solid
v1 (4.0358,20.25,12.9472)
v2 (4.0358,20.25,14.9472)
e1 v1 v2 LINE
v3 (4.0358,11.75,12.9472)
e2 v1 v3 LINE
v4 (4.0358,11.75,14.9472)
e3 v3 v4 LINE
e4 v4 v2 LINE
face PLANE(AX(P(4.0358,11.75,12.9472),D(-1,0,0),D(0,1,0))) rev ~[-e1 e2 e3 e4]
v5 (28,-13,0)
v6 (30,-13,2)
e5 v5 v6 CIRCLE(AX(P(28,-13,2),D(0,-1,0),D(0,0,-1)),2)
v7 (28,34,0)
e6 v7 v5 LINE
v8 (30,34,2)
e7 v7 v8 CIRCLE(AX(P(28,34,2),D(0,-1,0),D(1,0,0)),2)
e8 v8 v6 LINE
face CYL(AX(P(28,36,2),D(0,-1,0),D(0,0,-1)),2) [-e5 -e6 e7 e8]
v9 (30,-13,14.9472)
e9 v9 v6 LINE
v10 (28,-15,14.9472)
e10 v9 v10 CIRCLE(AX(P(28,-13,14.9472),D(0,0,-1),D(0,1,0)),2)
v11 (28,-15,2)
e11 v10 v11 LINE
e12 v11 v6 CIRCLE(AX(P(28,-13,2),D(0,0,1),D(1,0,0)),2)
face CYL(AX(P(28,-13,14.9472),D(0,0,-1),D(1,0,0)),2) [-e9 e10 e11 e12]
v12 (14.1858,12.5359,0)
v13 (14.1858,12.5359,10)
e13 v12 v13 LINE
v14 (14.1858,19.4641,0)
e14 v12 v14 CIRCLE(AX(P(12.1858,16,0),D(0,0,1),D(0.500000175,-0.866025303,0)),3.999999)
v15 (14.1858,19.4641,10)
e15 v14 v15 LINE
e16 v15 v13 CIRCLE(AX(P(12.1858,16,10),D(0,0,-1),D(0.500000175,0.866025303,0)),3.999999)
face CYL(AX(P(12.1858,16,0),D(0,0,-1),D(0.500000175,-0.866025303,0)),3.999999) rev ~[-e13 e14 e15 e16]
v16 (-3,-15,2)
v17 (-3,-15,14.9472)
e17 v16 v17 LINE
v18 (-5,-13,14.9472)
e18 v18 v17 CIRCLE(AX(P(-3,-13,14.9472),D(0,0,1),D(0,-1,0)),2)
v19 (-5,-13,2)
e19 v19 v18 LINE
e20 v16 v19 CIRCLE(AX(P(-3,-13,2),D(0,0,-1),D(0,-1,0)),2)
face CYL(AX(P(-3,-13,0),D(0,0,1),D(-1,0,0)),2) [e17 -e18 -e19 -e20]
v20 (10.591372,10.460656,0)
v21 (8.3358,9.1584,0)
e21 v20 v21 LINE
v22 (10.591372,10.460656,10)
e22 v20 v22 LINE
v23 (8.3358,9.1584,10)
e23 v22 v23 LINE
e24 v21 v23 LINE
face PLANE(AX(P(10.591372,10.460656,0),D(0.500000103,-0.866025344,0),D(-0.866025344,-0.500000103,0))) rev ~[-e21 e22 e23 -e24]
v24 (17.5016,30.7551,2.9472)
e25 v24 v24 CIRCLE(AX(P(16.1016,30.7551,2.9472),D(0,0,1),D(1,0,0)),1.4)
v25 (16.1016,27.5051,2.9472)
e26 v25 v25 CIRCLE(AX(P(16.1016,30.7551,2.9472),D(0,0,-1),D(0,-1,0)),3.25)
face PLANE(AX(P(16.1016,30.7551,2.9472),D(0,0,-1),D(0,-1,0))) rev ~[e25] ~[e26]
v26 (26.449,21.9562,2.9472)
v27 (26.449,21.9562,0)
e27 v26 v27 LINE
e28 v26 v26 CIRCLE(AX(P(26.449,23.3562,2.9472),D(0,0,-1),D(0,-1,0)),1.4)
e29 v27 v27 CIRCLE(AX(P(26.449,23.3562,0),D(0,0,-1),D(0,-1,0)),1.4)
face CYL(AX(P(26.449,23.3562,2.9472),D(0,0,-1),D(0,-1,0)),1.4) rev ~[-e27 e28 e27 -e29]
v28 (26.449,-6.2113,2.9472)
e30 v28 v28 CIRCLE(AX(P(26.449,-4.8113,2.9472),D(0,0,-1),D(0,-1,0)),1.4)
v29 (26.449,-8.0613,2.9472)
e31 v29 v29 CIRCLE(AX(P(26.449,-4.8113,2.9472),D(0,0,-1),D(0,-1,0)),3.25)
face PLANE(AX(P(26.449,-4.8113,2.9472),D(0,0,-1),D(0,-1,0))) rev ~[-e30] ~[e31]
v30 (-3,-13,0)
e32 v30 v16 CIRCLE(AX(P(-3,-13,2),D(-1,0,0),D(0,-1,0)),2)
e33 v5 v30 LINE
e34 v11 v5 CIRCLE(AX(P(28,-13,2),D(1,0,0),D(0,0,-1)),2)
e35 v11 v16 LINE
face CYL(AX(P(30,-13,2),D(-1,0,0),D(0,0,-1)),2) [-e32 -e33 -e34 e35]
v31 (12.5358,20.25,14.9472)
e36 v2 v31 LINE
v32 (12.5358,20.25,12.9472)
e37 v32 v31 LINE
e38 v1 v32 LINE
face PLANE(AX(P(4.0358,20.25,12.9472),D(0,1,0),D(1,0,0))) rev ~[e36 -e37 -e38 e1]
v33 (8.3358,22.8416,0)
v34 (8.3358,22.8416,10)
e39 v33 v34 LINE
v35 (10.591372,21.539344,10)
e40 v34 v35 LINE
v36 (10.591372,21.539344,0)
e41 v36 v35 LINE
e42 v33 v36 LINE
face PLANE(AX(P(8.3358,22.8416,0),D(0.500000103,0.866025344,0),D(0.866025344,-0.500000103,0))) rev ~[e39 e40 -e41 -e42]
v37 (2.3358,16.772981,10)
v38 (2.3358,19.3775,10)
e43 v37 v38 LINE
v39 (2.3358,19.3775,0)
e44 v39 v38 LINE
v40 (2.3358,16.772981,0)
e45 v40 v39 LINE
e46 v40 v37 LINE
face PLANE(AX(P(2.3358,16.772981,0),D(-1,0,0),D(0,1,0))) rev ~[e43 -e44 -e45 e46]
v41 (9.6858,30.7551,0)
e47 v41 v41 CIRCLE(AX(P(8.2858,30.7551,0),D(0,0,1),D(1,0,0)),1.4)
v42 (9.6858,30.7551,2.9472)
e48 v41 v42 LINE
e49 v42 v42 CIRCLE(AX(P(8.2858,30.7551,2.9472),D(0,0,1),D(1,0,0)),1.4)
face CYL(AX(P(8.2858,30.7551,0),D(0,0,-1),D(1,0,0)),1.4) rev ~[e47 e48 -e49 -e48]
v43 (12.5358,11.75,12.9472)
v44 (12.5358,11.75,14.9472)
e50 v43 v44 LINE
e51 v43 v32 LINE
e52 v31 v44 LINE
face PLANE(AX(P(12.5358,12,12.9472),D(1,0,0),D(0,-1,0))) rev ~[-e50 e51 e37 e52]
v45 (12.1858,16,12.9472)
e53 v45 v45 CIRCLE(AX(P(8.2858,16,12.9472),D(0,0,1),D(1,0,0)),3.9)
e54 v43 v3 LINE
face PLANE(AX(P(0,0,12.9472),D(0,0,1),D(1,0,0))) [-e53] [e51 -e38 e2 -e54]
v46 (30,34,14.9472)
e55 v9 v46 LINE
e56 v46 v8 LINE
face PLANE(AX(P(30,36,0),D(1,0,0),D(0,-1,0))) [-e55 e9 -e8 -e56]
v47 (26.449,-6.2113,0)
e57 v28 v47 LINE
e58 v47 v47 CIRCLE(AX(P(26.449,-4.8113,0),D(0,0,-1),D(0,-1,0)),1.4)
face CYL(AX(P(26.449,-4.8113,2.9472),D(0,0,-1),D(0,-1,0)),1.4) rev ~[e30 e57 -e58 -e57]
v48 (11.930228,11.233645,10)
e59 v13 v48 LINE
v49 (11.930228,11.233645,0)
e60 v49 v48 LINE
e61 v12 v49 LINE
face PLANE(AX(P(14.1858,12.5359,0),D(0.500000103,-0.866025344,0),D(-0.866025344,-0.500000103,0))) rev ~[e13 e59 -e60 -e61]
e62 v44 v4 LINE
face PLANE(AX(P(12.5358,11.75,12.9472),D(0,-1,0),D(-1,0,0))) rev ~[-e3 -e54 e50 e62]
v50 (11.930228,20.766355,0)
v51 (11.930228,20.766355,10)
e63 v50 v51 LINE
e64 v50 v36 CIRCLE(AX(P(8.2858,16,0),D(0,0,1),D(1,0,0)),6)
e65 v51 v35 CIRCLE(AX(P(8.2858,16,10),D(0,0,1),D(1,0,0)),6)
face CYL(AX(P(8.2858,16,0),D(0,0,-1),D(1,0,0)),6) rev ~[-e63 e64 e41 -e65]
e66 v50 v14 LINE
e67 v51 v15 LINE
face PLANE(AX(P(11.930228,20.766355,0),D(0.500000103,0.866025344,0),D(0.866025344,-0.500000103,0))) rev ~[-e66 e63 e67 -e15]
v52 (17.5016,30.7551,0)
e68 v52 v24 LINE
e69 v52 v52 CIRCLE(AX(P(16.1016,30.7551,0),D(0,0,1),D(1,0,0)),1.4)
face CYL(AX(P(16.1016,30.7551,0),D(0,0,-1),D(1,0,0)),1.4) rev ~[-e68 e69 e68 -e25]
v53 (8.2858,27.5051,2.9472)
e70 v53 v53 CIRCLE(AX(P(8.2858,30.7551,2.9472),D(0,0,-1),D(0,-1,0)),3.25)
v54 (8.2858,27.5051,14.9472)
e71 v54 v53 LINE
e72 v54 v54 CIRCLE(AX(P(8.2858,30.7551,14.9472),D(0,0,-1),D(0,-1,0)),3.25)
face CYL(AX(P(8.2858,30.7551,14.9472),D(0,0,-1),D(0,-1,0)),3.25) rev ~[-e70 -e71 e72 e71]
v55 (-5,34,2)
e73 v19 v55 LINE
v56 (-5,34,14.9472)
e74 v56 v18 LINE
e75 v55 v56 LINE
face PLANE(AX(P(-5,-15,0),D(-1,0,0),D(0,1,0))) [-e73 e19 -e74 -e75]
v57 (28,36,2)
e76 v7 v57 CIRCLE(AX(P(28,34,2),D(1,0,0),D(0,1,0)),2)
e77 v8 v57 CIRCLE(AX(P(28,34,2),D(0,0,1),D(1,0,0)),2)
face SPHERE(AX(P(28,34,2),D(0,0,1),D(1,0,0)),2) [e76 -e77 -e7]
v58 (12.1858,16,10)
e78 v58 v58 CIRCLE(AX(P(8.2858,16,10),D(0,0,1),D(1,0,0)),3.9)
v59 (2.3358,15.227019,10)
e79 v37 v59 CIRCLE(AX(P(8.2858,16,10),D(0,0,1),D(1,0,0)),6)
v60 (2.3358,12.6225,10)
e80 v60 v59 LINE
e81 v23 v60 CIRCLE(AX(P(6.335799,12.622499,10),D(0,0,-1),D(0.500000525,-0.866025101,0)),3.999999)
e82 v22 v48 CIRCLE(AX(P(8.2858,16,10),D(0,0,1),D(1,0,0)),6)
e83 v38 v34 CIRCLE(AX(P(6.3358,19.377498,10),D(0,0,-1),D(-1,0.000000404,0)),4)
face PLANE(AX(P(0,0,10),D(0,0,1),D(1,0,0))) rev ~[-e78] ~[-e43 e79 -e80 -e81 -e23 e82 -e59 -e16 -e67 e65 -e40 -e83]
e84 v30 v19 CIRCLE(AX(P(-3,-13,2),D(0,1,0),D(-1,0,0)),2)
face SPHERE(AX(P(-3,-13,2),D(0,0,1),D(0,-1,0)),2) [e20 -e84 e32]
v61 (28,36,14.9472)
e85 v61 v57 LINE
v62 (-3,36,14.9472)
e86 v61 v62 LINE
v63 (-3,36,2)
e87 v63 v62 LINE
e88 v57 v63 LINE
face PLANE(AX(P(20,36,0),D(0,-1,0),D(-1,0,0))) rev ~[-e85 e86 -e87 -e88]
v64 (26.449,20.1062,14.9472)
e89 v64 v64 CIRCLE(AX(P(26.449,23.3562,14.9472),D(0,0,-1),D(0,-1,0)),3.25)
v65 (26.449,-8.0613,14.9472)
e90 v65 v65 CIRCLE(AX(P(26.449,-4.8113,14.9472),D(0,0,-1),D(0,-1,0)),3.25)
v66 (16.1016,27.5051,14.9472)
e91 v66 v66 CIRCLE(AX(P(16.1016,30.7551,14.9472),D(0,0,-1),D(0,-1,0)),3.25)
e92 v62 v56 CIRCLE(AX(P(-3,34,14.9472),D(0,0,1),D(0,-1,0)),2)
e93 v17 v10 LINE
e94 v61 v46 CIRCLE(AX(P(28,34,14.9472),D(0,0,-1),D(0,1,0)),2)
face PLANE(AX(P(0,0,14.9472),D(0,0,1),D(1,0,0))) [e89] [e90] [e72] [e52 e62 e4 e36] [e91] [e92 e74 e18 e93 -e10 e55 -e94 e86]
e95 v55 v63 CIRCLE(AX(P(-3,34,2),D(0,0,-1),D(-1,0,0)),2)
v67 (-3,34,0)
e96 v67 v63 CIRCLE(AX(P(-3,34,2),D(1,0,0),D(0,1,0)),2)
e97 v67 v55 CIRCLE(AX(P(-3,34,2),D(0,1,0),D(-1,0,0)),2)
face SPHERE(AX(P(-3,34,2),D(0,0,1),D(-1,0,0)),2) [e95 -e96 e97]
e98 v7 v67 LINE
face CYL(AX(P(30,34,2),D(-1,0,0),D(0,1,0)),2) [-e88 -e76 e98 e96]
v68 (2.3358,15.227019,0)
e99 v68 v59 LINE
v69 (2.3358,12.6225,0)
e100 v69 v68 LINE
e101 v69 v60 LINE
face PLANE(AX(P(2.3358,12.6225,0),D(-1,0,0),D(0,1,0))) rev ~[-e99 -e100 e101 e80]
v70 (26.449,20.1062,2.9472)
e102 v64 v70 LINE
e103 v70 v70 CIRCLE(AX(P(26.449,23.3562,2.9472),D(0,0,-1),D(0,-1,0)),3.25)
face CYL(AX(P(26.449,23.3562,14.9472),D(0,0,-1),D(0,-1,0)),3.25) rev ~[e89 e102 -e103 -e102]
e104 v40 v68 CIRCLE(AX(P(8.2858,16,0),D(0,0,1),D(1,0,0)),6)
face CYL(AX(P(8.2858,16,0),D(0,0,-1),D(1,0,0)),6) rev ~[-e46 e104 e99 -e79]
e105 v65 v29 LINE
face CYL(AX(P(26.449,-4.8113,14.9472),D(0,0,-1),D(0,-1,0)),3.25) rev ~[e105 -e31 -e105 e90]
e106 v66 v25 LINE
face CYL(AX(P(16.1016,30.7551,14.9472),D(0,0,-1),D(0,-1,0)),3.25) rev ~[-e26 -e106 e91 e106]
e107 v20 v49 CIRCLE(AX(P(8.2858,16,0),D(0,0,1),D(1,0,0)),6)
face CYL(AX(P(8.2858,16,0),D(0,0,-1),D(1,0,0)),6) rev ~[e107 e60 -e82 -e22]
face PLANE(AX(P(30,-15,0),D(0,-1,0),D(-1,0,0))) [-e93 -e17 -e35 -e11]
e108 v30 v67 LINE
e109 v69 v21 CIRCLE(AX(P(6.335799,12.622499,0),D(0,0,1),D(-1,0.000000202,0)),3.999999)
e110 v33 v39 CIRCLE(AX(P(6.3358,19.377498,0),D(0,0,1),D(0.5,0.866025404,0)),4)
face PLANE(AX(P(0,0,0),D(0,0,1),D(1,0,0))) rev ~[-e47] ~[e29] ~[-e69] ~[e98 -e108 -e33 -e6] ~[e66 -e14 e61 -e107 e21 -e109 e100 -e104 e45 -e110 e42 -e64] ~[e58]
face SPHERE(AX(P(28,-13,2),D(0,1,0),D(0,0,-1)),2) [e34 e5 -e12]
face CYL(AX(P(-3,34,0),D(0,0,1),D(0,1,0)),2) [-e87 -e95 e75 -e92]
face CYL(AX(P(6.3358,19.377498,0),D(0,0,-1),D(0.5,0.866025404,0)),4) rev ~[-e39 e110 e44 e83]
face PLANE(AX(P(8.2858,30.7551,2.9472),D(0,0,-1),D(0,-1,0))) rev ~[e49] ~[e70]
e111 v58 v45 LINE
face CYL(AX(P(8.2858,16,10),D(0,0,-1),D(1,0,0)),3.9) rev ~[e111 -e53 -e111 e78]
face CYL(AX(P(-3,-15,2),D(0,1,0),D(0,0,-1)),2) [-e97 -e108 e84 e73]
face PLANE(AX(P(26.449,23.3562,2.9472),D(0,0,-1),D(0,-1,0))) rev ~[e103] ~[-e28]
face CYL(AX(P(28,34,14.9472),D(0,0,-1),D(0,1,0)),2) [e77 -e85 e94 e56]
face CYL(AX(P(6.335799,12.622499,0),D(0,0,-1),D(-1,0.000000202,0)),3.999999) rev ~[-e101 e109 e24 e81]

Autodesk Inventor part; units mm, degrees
ref_plane "YZ Plane" through (0, 0, 0) normal (1, 0, 0) x (0, 1, 0)
ref_plane "XZ Plane" through (0, 0, 0) normal (0, 1, 0) x (-1, 0, 0)
ref_plane "XY Plane" through (0, 0, 0) normal (0, 0, 1) x (1, 0, 0)
ref_plane "Arbeitsebene1" through (0, 0, 0) normal (0, 0, 1) x (1, 0, 0)
sketch "Skizze1" plane through (0, 0, 0) normal (0, 0, 1) x (1, 0, 0)
  line L0 (20, 36) -> (0, 36) projected
  line L1 (0, 0) -> (0, 36) projected
  line L2 (20, 0) -> (0, 0) projected
  line L3 (20, 0) -> (20, 36) projected
  arc A0 (15.4309, 14.7711) -> (15.4309, 17.2289) centre (16.1016, 16) ccw projected
  arc A1 (15.4309, 17.2289) -> (15.4309, 14.7711) centre (8.2858, 16) ccw projected
  circle A2 centre (8.2858, 30.7551) radius 1.4 projected
  circle A3 centre (16.1016, 30.7551) radius 1.4 projected
  circle A4 centre (8.2858, 16) radius 6 projected
  line L4 (14.1858, 12.5359) -> (8.3358, 9.1584)
  line L5 (2.3358, 12.6225) -> (2.3358, 19.3775)
  line L6 (8.3358, 22.8416) -> (14.1858, 19.4641)
  circle A5 centre (8.2858, 16) radius 5.95
  arc A6 (14.1858, 12.5359) -> (14.1858, 19.4641) centre (12.1858, 16) ccw
  arc A7 (2.3358, 12.6225) -> (8.3358, 9.1584) centre (6.3358, 12.6225) ccw
  arc A8 (8.3358, 22.8416) -> (2.3358, 19.3775) centre (6.3358, 19.3775) ccw
  line L7 (-5, 36) -> (30, 36)
  line L8 (30, 36) -> (30, -15)
  line L9 (30, -15) -> (-5, -15)
  line L10 (-5, -15) -> (-5, 36)
  point P0 (20.1858, 16)
  point P1 (2.3358, 5.6943)
  point P2 (2.3358, 26.3057)
  point P3 (10.5914, 21.5393)
  point P4 (11.9302, 20.7664)
  point P5 (11.9302, 11.2336)
  point P6 (10.5914, 10.4607)
  point P7 (2.3358, 15.227)
  point P8 (2.3358, 16.773)
  dimension "d0" = 11.9
  dimension "d1" = 4
  dimension "d2" = 10
  dimension "d3" = 0
  dimension "d4" = 5
  dimension "d5" = 15
extrude "Extrusion1" add sketch "Skizze1" along normal blind 10 contours L3 L2 L1 L0 | L7 L8 L9 L10 L1 L2 L3 | A6 A0 | A1 A7 L4 A4 A6 | A6 L6 A4 A8 A1 | A1 A8 L5 A4 A7
sketch "Skizze2" plane through (0, 0, 10) normal (0, 0, 1) x (1, 0, 0)
  line L0 (-5, -15) -> (30, -15) projected
  line L1 (30, -15) -> (30, 36) projected
  line L2 (30, 36) -> (-5, 36) projected
  line L3 (-5, 36) -> (-5, -15) projected
  circle A0 centre (16.1016, 30.7551) radius 1.4 projected
  circle A1 centre (8.2858, 30.7551) radius 1.4 projected
  arc A2 (8.3358, 22.8416) -> (2.3358, 19.3775) centre (6.3358, 19.3775) ccw projected
  line L4 (8.3358, 22.8416) -> (10.5914, 21.5393) projected
  arc A3 (11.9302, 20.7664) -> (10.5914, 21.5393) centre (8.2858, 16) ccw projected
  line L5 (11.9302, 20.7664) -> (14.1858, 19.4641) projected
  arc A4 (14.1858, 12.5359) -> (14.1858, 19.4641) centre (12.1858, 16) ccw projected
  line L6 (14.1858, 12.5359) -> (11.9302, 11.2336) projected
  arc A5 (10.5914, 10.4607) -> (11.9302, 11.2336) centre (8.2858, 16) ccw projected
  line L7 (10.5914, 10.4607) -> (8.3358, 9.1584) projected
  arc A6 (2.3358, 12.6225) -> (8.3358, 9.1584) centre (6.3358, 12.6225) ccw projected
  line L8 (2.3358, 12.6225) -> (2.3358, 15.227) projected
  arc A7 (2.3358, 16.773) -> (2.3358, 15.227) centre (8.2858, 16) ccw projected
  line L9 (2.3358, 16.773) -> (2.3358, 19.3775) projected
  circle A8 centre (8.2858, 16) radius 3.9
  point P0 (0, 0)
  dimension "d8" = 7.8
extrude "Extrusion2" add sketch "Skizze2" along normal up to surface (2.9472 mm away) contours L3 L2 L1 L0 | L4 A3 L5 A4 L6 A5 L7 A6 L8 A7 L9 A2
sketch "Skizze3" plane through (0, 0, 12.9472) normal (0, 0, 1) x (1, 0, 0)
  circle A0 centre (8.2858, 16) radius 3.6158 projected
  line L0 (4.0358, 12) -> (4.0358, 20) projected
  line L1 (12.5358, 20) -> (12.5358, 12) projected
  line L2 (4.0358, 20.25) -> (12.5358, 20.25)
  line L3 (12.5358, 20.25) -> (12.5358, 11.75)
  line L4 (12.5358, 11.75) -> (4.0358, 11.75)
  line L5 (4.0358, 11.75) -> (4.0358, 20.25)
  line L6 (4.0358, 20.25) -> (12.5358, 11.75) construction
  line L7 (12.5358, 20.25) -> (4.0358, 11.75) construction
  line L8 (30, -15) -> (30, 36) projected
  line L9 (30, 36) -> (-5, 36) projected
  line L10 (-5, 36) -> (-5, -15) projected
  line L11 (-5, -15) -> (30, -15) projected
  circle A1 centre (8.2858, 16) radius 3.9 projected
  circle A2 centre (8.2858, 30.7551) radius 1.4 projected
  circle A3 centre (16.1016, 30.7551) radius 1.4 projected
  point P0 (0, 0)
  point P1 (11.389, 20.2649)
  dimension "d11" = 8.5
  dimension "d12" = 8.5
extrude "Extrusion3" add sketch "Skizze3" along normal blind 2 contours L11 L10 L9 L8 | A3
sketch "Skizze4" plane through (0, 0, 14.9472) normal (0, 0, 1) x (1, 0, 0)
  circle A0 centre (8.2858, 30.7551) radius 1.4 projected
  circle A1 centre (16.1016, 30.7551) radius 1.4 projected
  arc A2 (21.7732, 26.3966) -> (20.7732, 27.3966) centre (20.7732, 26.3966) ccw projected
  arc A3 (20.7732, -12.6034) -> (21.7732, -11.6034) centre (20.7732, -11.6034) ccw projected
  circle A4 centre (26.449, 23.3562) radius 1.4
  circle A5 centre (26.449, -4.8113) radius 1.4
  point P0 (0, 0)
  dimension "d23" = 2.8
  dimension "d24" = 2.8
hole "Bohrung1" at (8.2858, 30.7551, 14.9472) at (16.1016, 30.7551, 14.9472) at (26.449, 23.3562, 14.9472) at (26.449, -4.8113, 14.9472) direction (0, 0, -1) diameter 2.8 depth 30 counterbore diameter 6.5 counterbore depth 12
fillet "Rundung1" radius 2 8 edges at (-5, -15, 7.4736) (-5, 36, 7.4736) (30, 36, 7.4736) (30, 10.5, 0) (12.5, -15, 0) (-5, 10.5, 0) (12.5, 36, 0) (30, -15, 7.4736)
properties part number "30_ESP32_Camera_tray"
